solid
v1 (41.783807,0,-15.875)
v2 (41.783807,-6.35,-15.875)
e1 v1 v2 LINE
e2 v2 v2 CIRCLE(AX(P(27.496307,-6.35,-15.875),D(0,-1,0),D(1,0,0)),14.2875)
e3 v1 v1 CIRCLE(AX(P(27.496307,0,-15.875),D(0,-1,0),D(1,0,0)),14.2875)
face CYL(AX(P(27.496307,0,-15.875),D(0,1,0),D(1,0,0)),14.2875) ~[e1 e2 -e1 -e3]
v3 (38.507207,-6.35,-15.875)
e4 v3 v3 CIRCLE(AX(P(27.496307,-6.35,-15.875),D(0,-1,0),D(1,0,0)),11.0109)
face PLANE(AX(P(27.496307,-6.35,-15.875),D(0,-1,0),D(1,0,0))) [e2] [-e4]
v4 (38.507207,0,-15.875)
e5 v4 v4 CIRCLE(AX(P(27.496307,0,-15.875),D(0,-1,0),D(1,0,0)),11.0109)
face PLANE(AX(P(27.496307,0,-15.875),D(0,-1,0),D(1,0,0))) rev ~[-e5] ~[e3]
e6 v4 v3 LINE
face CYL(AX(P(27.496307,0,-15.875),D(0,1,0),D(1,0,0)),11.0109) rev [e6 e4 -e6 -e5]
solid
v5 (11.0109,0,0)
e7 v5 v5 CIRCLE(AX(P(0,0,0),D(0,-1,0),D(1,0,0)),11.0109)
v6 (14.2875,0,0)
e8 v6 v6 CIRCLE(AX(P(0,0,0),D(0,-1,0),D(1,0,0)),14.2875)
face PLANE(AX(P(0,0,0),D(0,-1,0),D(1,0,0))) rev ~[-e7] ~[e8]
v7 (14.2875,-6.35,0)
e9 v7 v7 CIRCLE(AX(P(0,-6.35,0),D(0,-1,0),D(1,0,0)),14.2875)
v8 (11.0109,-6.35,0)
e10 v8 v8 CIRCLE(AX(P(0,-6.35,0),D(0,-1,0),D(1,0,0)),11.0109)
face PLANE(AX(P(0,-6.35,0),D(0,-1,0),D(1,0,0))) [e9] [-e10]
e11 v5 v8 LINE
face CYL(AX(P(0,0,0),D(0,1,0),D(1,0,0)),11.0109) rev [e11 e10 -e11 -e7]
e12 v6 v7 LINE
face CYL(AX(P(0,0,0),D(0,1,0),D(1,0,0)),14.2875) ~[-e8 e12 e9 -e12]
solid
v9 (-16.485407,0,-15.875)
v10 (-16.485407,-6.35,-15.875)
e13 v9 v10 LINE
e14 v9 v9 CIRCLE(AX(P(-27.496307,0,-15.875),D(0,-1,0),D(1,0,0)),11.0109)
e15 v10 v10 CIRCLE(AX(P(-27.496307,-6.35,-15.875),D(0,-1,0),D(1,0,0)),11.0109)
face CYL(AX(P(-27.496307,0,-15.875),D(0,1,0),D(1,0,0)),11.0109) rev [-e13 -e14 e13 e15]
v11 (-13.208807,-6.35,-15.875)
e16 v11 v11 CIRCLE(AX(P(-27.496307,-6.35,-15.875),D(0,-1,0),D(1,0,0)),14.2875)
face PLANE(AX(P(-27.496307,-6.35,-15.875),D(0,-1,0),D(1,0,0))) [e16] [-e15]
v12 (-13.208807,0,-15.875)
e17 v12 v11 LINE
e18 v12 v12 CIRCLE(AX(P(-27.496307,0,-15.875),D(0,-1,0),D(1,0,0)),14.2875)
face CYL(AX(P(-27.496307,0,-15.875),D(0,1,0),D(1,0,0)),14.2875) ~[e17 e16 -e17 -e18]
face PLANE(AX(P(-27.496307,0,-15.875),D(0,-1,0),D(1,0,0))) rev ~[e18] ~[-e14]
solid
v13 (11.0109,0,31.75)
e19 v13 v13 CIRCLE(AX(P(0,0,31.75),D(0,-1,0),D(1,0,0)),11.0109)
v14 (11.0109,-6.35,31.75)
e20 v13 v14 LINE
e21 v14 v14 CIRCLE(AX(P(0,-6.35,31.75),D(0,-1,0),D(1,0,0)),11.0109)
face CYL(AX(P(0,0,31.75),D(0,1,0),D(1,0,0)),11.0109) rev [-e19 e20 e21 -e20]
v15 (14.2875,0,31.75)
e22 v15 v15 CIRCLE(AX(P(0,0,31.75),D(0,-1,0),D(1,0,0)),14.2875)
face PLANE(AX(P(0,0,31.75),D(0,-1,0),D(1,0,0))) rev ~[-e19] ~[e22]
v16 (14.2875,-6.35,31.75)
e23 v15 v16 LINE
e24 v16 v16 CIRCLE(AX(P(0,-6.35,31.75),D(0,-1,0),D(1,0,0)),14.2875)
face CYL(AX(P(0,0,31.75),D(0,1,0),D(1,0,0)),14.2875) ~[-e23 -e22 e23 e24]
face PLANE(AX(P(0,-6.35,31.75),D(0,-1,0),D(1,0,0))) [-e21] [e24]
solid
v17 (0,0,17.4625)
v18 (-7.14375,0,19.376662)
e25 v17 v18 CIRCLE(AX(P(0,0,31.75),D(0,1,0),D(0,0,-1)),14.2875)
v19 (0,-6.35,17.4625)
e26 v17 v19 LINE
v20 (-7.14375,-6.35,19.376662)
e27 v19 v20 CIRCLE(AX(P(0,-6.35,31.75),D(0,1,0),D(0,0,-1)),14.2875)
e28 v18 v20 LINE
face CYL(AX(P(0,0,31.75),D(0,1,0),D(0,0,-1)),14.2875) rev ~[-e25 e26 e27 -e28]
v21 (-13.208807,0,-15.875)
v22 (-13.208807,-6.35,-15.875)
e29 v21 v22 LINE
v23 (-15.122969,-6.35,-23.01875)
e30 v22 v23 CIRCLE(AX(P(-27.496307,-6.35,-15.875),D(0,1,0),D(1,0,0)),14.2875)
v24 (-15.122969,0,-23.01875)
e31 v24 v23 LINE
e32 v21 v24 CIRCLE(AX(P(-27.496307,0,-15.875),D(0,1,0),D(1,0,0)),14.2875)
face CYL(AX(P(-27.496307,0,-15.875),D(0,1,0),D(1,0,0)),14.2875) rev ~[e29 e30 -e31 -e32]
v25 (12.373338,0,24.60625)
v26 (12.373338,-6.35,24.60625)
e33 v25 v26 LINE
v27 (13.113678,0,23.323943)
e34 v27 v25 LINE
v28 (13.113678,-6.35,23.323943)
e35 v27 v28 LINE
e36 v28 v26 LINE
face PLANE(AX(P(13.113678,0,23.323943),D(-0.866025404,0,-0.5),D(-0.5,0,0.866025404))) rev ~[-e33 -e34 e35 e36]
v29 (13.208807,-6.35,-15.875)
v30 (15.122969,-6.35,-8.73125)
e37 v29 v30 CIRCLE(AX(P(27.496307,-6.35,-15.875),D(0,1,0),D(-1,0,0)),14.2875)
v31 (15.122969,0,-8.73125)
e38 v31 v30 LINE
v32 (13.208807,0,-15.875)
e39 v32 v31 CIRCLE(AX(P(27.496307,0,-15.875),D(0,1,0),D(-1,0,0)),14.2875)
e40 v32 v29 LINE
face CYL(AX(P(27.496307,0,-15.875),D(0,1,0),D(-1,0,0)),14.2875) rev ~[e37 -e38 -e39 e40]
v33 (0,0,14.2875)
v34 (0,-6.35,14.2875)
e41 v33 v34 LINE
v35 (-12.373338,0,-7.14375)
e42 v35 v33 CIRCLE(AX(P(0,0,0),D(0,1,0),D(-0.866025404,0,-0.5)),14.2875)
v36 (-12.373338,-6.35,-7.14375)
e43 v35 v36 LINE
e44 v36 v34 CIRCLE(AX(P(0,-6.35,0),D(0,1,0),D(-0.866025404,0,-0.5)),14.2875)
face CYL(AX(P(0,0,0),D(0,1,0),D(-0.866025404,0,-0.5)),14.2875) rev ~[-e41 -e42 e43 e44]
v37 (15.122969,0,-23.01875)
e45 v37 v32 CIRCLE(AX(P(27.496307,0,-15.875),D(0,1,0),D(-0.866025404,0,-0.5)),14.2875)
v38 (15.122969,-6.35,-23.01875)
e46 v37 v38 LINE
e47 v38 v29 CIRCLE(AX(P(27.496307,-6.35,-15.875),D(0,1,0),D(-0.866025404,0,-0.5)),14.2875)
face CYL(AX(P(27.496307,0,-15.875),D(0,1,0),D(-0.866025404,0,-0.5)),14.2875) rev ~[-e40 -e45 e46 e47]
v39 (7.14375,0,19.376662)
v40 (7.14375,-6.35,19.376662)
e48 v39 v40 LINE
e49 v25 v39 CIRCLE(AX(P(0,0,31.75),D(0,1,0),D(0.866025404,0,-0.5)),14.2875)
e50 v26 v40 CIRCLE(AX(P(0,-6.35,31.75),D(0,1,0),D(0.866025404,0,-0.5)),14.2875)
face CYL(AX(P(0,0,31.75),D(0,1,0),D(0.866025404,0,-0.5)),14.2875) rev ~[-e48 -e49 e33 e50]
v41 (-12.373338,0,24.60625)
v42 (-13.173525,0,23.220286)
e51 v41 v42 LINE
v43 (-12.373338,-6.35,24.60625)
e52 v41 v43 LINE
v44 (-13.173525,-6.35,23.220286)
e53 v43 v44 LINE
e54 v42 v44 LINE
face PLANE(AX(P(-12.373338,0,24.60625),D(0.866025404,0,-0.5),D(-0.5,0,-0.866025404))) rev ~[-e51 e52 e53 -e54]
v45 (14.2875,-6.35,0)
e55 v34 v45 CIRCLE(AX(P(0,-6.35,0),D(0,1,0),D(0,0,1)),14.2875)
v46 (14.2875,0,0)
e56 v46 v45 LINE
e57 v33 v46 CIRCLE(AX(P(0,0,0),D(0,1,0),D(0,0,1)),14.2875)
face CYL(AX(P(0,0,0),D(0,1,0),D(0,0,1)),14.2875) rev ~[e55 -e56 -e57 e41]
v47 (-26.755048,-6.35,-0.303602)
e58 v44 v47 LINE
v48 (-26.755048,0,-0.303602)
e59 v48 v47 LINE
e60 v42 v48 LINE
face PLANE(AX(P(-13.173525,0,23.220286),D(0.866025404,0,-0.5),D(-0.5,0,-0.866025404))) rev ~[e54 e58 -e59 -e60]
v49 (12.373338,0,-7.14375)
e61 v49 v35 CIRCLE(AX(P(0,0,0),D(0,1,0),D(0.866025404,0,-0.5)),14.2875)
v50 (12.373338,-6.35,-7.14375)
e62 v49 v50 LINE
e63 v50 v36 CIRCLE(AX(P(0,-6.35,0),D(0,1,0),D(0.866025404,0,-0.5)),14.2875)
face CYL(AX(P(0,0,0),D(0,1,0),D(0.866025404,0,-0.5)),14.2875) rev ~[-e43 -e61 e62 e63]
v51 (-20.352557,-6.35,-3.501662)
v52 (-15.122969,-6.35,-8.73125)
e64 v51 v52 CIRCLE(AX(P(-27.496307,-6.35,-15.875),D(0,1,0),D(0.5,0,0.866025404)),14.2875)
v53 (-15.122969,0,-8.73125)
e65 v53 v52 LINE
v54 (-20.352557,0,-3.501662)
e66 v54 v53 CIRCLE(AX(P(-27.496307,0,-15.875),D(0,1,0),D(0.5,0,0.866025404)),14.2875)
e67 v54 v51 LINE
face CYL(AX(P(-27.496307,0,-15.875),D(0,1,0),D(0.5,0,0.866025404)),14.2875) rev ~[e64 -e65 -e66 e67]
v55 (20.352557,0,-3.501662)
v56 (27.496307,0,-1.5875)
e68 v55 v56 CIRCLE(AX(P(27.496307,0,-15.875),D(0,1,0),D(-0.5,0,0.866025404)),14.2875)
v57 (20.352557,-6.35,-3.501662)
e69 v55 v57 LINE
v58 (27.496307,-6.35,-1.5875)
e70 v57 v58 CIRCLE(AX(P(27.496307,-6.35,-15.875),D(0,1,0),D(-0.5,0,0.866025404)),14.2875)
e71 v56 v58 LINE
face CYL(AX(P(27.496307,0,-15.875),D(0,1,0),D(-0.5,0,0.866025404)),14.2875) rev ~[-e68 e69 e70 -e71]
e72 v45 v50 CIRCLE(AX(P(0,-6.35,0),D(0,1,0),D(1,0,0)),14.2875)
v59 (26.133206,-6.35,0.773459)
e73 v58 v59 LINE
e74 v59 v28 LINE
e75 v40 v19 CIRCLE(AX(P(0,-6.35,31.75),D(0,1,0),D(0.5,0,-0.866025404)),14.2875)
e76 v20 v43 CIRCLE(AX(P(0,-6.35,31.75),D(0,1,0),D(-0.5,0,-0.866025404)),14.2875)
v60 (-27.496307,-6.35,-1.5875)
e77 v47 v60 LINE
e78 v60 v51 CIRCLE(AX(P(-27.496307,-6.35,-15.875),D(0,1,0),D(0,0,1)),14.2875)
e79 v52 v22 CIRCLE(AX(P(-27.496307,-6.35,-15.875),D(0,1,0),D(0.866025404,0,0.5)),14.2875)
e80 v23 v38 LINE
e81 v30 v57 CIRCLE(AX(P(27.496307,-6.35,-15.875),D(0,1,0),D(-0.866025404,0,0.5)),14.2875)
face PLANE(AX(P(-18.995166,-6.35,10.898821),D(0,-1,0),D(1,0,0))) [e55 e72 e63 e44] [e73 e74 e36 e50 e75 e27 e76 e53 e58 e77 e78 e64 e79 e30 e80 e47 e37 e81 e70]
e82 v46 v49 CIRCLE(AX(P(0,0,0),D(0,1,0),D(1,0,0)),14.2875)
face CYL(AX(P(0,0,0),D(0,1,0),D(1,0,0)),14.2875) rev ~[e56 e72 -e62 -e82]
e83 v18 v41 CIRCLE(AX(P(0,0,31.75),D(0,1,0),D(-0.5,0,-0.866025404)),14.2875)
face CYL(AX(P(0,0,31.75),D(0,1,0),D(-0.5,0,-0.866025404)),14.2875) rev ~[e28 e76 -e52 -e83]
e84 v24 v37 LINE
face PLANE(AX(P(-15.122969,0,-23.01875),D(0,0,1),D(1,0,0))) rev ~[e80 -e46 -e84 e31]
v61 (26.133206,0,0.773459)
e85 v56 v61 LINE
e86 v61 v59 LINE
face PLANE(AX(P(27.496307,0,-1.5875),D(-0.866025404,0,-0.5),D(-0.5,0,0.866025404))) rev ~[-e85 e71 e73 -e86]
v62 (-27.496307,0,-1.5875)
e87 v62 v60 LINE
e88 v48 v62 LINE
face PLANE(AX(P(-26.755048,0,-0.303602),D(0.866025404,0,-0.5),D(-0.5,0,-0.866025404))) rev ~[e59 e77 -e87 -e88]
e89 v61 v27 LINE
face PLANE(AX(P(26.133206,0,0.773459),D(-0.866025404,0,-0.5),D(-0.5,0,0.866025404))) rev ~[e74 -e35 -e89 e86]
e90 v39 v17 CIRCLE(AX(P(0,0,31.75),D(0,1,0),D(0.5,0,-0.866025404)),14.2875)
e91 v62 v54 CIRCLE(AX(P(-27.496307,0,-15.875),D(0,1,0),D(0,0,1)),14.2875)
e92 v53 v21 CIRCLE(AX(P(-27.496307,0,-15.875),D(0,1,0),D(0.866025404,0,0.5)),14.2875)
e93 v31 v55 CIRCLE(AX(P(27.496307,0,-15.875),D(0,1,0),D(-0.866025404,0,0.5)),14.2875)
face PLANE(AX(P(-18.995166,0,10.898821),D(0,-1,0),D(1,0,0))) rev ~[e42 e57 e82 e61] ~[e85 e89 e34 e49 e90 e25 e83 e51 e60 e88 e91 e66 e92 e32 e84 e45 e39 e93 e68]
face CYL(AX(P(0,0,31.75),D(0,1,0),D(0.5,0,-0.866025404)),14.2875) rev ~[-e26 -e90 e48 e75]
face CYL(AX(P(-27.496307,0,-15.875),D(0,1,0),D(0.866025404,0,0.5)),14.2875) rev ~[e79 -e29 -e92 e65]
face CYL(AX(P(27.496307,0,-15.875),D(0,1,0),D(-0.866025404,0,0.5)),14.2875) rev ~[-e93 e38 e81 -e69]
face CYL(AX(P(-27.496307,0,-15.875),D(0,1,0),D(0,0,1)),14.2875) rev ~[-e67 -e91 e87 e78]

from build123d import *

# Parameters (mm, degrees)
F0_R     = 14.2875
F0_R_2   = 11.0109
F1_DEPTH = 6.35
F3_DEPTH = 6.35


with BuildPart() as f1:
    # F0 (on Front) → F1 (new body)
    with BuildSketch(Plane.XZ):
        with Locations((0, 31.75)):
            Circle(F0_R)
        with Locations((0, 31.75)):
            Circle(F0_R_2, mode=Mode.SUBTRACT)
    extrude(amount=F1_DEPTH)


with BuildPart() as f1b:
    # F0 (on Front) → F1, piece 2 (new body)
    with BuildSketch(Plane.XZ):
        Circle(F0_R)
        Circle(F0_R_2, mode=Mode.SUBTRACT)
    extrude(amount=F1_DEPTH)


with BuildPart() as f1c:
    # F0 (on Front) → F1, piece 3 (new body)
    with BuildSketch(Plane.XZ):
        with Locations((27.4963065702, -15.875)):
            Circle(F0_R)
        with Locations((27.4963065702, -15.875)):
            Circle(F0_R_2, mode=Mode.SUBTRACT)
    extrude(amount=F1_DEPTH)


with BuildPart() as f1d:
    # F0 (on Front) → F1, piece 4 (new body)
    with BuildSketch(Plane.XZ):
        with Locations((-27.4963065702, -15.875)):
            Circle(F0_R)
        with Locations((-27.4963065702, -15.875)):
            Circle(F0_R_2, mode=Mode.SUBTRACT)
    extrude(amount=F1_DEPTH)


with BuildPart() as f3:
    # F2 (on Front) → F3 (new body)
    with BuildSketch(Plane.XZ):
        with BuildLine():
            Line((-13.1735245665, 23.2202861361), (-26.7550475149, -0.3036016547))
            ThreePointArc((-26.7550475149, -0.3036016547), (-16.7530650469, 9.6043429355), (-13.1735245665, 23.2202861361))
        make_face()
        with BuildLine():
            ThreePointArc((-13.1735245665, 23.2202861361), (-16.7530650469, 9.6043429355), (-26.7550475149, -0.3036016547))
            Line((-26.7550475149, -0.3036016547), (-27.4963065702, -1.5875))
            ThreePointArc((-27.4963065702, -1.5875), (-23.7984294633, -2.0743347569), (-20.3525565702, -3.5016620434))
            Line((-20.3525565702, -3.5016620434), (-7.14375, 19.3766620434))
            ThreePointArc((-7.14375, 19.3766620434), (-10.1027881362, 21.6472118638), (-12.3733379566, 24.60625))
            Line((-12.3733379566, 24.60625), (-13.1735245665, 23.2202861361))
        make_face()
        with BuildLine():
            Line((-7.14375, 19.3766620434), (-20.3525565702, -3.5016620434))
            ThreePointArc((-20.3525565702, -3.5016620434), (-17.393518434, -5.7722118638), (-15.1229686136, -8.73125))
            Line((-15.1229686136, -8.73125), (-12.3733379566, -7.14375))
            ThreePointArc((-12.3733379566, -7.14375), (-12.3733379566, 7.14375), (0, 14.2875))
            Line((0, 14.2875), (0, 17.4625))
            ThreePointArc((0, 17.4625), (-3.6978771069, 17.9493347569), (-7.14375, 19.3766620434))
        make_face()
        with BuildLine():
            ThreePointArc((-13.2088065702, -15.875), (-13.6956413271, -19.5728771069), (-15.1229686136, -23.01875))
            Line((-15.1229686136, -23.01875), (-13.8199954558, -23.01875))
            ThreePointArc((-13.8199954558, -23.01875), (-0.0006031297, -18.5930397834), (13.8187891964, -23.01875))
            Line((13.8187891964, -23.01875), (15.1229686136, -23.01875))
            ThreePointArc((15.1229686136, -23.01875), (13.6956413271, -19.5728771069), (13.2088065702, -15.875))
            Line((13.2088065702, -15.875), (-13.2088065702, -15.875))
        make_face()
        with BuildLine():
            Line((-12.3733379566, -7.14375), (-15.1229686136, -8.73125))
            ThreePointArc((-15.1229686136, -8.73125), (-13.6956413271, -12.1771228931), (-13.2088065702, -15.875))
            Line((-13.2088065702, -15.875), (13.2088065702, -15.875))
            ThreePointArc((13.2088065702, -15.875), (13.6956413271, -12.1771228931), (15.1229686136, -8.73125))
            Line((15.1229686136, -8.73125), (12.3733379566, -7.14375))
            ThreePointArc((12.3733379566, -7.14375), (0, -14.2875), (-12.3733379566, -7.14375))
        make_face()
        with BuildLine():
            ThreePointArc((13.8187891964, -23.01875), (-0.0006031297, -18.5930397834), (-13.8199954558, -23.01875))
            Line((-13.8199954558, -23.01875), (13.8187891964, -23.01875))
        make_face()
        with BuildLine():
            ThreePointArc((7.14375, 19.3766620434), (3.6978771069, 17.9493347569), (0, 17.4625))
            Line((0, 17.4625), (0, 14.2875))
            ThreePointArc((0, 14.2875), (10.1027881362, 10.1027881362), (14.2875, 0))
            ThreePointArc((14.2875, 0), (13.8006652431, -3.6978771069), (12.3733379566, -7.14375))
            Line((12.3733379566, -7.14375), (15.1229686136, -8.73125))
            ThreePointArc((15.1229686136, -8.73125), (17.393518434, -5.7722118638), (20.3525565702, -3.5016620434))
            Line((20.3525565702, -3.5016620434), (7.14375, 19.3766620434))
        make_face()
        with BuildLine():
            ThreePointArc((12.3733379566, 24.60625), (10.1027881362, 21.6472118638), (7.14375, 19.3766620434))
            Line((7.14375, 19.3766620434), (20.3525565702, -3.5016620434))
            ThreePointArc((20.3525565702, -3.5016620434), (23.7984294633, -2.0743347569), (27.4963065702, -1.5875))
            Line((27.4963065702, -1.5875), (26.1332062792, 0.7734589597))
            ThreePointArc((26.1332062792, 0.7734589597), (16.8650497396, 10.4561422475), (13.1136783054, 23.323942901))
            Line((13.1136783054, 23.323942901), (12.3733379566, 24.60625))
        make_face()
        with BuildLine():
            Line((26.1332062792, 0.7734589597), (13.1136783054, 23.323942901))
            ThreePointArc((13.1136783054, 23.323942901), (16.8650497396, 10.4561422475), (26.1332062792, 0.7734589597))
        make_face()
    extrude(amount=F3_DEPTH)


solid = Compound([f1.part, f1b.part, f1c.part, f1d.part, f3.part])
